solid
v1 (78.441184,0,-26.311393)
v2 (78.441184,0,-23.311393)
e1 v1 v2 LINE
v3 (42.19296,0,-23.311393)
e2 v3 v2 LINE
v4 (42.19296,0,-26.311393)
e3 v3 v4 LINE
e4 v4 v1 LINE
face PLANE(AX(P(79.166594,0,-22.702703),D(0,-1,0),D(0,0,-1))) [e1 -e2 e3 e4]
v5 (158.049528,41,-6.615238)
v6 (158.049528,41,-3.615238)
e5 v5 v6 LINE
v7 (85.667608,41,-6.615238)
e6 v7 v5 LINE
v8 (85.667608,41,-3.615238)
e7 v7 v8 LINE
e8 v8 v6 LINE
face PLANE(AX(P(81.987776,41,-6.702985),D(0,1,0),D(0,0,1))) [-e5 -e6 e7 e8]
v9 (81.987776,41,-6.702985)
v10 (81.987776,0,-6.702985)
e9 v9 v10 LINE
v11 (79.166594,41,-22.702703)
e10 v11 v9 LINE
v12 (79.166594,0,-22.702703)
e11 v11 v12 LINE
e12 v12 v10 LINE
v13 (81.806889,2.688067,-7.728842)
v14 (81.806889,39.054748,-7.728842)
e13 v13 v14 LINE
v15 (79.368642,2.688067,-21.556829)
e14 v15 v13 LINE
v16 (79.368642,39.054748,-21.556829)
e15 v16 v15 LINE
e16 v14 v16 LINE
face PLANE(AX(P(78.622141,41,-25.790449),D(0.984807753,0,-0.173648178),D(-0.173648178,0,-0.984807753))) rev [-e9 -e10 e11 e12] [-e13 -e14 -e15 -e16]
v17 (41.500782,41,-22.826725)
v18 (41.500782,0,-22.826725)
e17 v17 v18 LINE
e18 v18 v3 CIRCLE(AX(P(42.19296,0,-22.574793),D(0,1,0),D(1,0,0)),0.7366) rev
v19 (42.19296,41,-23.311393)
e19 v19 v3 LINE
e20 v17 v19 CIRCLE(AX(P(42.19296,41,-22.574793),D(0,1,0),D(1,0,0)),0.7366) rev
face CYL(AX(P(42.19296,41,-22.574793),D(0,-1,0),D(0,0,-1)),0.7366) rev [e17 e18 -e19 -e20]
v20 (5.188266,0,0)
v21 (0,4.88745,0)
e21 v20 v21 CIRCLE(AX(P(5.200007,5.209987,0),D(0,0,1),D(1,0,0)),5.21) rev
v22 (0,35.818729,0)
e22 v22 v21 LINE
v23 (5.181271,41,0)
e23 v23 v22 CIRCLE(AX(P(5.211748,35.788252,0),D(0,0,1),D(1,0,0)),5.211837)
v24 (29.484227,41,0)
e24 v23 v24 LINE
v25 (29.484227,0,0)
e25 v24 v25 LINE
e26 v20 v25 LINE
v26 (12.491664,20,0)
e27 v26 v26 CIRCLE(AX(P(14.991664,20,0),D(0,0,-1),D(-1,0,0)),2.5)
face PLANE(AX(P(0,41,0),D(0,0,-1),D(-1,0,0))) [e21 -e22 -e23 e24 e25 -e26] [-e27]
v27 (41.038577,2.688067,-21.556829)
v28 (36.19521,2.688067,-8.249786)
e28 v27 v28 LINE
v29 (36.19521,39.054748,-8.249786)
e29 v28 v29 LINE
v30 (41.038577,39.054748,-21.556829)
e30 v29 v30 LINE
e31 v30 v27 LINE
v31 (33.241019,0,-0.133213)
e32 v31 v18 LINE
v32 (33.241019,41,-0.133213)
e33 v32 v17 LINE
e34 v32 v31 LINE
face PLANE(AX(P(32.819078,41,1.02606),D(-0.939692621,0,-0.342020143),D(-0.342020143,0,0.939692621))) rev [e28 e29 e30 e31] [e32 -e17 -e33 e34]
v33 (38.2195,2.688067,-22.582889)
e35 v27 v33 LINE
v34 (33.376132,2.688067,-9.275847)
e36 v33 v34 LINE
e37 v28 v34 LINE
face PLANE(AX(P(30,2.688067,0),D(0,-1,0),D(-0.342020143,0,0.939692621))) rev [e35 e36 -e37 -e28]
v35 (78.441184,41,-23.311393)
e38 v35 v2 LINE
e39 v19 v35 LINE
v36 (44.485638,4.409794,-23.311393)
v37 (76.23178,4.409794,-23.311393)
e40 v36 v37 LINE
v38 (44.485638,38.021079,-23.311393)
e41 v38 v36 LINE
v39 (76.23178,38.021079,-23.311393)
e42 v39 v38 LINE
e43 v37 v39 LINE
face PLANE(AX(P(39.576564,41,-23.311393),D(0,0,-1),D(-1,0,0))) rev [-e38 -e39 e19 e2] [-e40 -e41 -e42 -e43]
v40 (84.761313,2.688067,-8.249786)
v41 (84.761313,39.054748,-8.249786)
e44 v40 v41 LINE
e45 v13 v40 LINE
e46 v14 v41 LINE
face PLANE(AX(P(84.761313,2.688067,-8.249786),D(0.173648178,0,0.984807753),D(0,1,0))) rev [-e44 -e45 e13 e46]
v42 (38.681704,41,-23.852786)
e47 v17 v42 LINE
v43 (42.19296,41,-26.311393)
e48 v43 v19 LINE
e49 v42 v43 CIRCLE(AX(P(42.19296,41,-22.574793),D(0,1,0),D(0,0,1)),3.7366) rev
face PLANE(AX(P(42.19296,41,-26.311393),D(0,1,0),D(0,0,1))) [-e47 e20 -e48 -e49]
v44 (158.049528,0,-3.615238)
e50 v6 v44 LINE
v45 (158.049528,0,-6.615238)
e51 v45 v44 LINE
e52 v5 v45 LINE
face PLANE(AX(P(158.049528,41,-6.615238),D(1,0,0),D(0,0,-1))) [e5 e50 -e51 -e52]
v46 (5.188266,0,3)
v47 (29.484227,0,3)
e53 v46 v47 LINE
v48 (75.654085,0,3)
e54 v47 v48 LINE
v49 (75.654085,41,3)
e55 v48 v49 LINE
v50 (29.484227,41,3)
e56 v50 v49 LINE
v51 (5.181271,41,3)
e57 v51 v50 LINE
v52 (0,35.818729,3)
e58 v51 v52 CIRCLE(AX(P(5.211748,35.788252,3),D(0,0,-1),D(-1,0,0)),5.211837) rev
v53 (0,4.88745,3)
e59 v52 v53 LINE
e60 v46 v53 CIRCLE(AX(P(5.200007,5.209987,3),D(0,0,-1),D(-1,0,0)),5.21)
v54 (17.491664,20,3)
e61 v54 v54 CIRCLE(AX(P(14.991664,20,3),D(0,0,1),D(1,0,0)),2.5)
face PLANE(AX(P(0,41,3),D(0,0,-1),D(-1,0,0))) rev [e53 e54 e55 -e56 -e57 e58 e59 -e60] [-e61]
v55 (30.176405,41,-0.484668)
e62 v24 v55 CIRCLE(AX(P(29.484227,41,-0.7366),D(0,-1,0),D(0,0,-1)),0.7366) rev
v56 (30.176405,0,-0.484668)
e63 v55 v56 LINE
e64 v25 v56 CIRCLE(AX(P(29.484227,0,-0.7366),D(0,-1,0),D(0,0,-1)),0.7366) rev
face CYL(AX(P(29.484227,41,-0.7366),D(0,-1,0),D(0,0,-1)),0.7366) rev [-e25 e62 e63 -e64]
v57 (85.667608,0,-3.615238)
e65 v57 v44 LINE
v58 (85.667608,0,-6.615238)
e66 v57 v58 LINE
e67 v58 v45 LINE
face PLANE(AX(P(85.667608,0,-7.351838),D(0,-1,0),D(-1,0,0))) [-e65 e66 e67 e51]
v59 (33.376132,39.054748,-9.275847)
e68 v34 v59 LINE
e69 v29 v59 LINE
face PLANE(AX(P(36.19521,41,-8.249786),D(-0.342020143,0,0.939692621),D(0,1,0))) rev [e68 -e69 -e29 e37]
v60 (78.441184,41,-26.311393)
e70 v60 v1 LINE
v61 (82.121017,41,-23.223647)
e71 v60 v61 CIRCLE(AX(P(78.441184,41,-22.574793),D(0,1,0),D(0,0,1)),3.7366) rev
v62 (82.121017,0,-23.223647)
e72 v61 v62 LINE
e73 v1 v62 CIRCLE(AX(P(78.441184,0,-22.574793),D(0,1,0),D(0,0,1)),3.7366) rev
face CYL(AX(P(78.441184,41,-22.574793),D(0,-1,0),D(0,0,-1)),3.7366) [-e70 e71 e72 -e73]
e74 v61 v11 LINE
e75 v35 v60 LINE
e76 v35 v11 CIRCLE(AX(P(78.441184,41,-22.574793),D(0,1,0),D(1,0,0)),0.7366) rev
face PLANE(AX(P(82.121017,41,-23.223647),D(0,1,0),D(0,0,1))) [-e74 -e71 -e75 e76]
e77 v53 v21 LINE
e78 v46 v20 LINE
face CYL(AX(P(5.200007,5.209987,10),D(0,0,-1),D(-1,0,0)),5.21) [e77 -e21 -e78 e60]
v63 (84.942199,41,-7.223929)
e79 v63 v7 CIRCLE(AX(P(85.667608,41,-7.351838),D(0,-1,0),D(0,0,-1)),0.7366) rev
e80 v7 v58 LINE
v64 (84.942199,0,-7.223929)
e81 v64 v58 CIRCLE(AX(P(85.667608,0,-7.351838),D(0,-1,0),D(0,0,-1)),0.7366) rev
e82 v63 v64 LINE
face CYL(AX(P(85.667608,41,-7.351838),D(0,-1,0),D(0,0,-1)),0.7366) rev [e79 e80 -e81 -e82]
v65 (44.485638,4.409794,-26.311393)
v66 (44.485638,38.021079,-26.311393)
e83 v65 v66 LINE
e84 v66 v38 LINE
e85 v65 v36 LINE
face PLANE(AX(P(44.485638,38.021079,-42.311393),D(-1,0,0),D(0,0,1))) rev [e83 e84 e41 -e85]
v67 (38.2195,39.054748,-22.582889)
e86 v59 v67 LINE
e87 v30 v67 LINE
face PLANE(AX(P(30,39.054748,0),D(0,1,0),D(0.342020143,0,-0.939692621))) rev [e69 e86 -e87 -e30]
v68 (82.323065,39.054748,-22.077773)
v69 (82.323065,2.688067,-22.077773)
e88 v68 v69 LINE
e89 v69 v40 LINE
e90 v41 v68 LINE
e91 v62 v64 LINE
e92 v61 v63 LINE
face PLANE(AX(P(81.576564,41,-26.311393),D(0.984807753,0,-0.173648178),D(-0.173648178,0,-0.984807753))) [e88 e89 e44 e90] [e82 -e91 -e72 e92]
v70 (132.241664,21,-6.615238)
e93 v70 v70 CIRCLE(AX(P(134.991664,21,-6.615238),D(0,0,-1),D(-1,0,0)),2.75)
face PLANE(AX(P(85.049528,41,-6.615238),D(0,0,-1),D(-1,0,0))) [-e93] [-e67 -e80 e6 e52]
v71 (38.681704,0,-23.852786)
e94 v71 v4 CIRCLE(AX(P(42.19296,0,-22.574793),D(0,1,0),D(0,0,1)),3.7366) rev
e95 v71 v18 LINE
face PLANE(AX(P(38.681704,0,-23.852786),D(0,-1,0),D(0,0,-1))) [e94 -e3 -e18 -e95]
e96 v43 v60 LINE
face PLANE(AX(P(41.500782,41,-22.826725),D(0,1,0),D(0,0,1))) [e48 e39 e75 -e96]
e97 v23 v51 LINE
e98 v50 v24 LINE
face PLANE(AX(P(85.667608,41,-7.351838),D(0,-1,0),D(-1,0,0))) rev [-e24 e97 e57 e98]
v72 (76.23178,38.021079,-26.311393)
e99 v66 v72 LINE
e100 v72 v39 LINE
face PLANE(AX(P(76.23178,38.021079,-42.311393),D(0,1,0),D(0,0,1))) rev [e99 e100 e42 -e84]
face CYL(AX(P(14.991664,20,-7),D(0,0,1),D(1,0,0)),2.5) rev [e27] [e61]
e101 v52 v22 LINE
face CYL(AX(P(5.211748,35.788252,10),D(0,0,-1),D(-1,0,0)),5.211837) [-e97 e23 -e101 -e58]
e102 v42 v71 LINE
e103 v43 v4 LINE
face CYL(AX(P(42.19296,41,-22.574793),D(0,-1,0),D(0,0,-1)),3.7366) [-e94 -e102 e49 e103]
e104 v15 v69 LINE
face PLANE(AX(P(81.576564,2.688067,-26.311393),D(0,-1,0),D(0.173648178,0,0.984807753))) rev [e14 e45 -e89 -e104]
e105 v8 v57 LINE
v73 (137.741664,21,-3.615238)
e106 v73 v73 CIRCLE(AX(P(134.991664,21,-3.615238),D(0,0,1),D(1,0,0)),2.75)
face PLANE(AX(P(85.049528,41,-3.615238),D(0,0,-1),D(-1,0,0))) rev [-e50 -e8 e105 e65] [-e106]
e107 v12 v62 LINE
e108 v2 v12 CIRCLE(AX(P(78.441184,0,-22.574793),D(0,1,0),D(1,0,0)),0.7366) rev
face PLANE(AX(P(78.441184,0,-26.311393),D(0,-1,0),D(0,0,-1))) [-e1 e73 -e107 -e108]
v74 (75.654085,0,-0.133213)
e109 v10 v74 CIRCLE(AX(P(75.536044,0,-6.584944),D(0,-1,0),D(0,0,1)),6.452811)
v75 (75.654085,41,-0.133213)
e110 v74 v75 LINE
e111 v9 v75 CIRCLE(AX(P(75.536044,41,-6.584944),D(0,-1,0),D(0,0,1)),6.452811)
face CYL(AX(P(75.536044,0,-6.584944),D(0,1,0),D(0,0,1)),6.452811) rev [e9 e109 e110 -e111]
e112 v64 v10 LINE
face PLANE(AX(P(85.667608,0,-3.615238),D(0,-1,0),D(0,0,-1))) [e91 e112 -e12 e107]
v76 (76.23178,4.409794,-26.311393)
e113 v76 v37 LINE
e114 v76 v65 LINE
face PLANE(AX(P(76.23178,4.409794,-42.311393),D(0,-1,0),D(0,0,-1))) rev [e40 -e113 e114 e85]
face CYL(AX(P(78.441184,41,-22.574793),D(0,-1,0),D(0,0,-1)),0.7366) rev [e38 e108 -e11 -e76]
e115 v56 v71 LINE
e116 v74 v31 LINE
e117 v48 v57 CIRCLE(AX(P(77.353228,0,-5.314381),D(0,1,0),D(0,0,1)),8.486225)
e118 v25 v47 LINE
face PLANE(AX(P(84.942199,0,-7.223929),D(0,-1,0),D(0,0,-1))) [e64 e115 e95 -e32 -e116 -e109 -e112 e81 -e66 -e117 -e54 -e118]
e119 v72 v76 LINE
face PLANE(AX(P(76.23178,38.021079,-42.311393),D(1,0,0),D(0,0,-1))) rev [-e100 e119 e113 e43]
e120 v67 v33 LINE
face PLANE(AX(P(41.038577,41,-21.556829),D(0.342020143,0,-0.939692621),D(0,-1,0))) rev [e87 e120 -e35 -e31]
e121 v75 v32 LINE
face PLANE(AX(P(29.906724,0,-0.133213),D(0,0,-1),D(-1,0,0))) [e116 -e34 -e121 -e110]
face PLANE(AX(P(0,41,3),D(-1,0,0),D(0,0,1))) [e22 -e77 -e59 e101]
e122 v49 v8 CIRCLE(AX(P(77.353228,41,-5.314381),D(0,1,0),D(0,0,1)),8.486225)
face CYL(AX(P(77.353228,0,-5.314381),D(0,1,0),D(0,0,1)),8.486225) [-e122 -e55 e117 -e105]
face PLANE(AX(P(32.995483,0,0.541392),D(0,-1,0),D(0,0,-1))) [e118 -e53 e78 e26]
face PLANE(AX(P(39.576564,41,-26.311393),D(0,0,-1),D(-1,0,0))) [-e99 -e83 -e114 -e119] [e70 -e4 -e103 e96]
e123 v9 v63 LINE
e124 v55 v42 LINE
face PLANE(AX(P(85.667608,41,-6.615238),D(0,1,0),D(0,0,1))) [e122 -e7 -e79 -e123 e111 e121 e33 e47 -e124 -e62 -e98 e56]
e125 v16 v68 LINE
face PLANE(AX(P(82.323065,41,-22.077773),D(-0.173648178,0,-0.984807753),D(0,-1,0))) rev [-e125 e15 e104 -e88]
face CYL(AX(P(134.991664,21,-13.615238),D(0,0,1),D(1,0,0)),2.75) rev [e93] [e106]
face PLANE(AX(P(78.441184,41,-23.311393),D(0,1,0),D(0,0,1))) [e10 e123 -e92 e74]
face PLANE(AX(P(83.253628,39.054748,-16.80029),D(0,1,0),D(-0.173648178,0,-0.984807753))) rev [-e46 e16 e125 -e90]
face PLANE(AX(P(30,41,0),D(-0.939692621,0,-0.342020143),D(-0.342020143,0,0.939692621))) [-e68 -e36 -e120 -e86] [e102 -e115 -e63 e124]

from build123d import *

# Parameters (mm, degrees)
BASE_FLANGE1_DEPTH  = 41
SKETCH2_R           = 2.5
CUT_EXTRUDE1_DEPTH  = 10
SKETCH3_R           = 2.75
SKETCH3_R_2         = 2.5
CUT_EXTRUDE2_DEPTH  = 10
BOSS_EXTRUDE1_START = -41
BOSS_EXTRUDE1_DEPTH = 41
SKETCH5_W           = 31.746142427
SKETCH5_H           = 33.611284957
CUT_EXTRUDE3_DEPTH  = 19
CUT_EXTRUDE4_START  = 2.688066512
CUT_EXTRUDE4_DEPTH  = 36.36668128
CUT_EXTRUDE5_DEPTH  = 3


# Read off the part's stored shape, not the designer's step: Cut-Extrude4, Cut-Extrude5
# Sheet-metal steps are written as plain solids
with BuildPart() as part:
    # Sketch1 → Base-Flange1 (new body)
    with BuildSketch(Plane(origin=(0, 0, 0), x_dir=(1, 0, 0), z_dir=(0, 1, 0))):
        with BuildLine():
            Line((0, 0), (29.484227127, 0))
            ThreePointArc((29.484227127, 0), (29.90672353, 0.133212604), (30.176404712, 0.484667962))
            Line((30.176404712, 0.484667962), (38.681704054, 23.85278585))
            ThreePointArc((38.681704054, 23.85278585), (40.049733788, 25.635636911), (42.1929595, 26.311393382))
            Line((42.1929595, 26.311393382), (78.441184331, 26.311393382))
            ThreePointArc((78.441184331, 26.311393382), (80.843024514, 25.437195048), (82.121016981, 23.223647163))
            Line((82.121016981, 23.223647163), (84.942198964, 7.223929074))
            ThreePointArc((84.942198964, 7.223929074), (85.194131001, 6.787569985), (85.667608355, 6.615238322))
            Line((85.667608355, 6.615238322), (158.049527566, 6.615238322))
            Line((158.049527566, 6.615238322), (158.049527566, 3.615238322))
            Line((158.049527566, 3.615238322), (85.667608355, 3.615238322))
            ThreePointArc((85.667608355, 3.615238322), (83.265768172, 4.489436656), (81.987775705, 6.702984541))
            Line((81.987775705, 6.702984541), (79.166593722, 22.70270263))
            ThreePointArc((79.166593722, 22.70270263), (78.914661685, 23.139061719), (78.441184331, 23.311393382))
            Line((78.441184331, 23.311393382), (42.1929595, 23.311393382))
            ThreePointArc((42.1929595, 23.311393382), (41.770463097, 23.178180778), (41.500781916, 22.82672542))
            Line((41.500781916, 22.82672542), (32.995482574, -0.541392468))
            ThreePointArc((32.995482574, -0.541392468), (31.627452839, -2.324243529), (29.484227127, -3))
            Line((29.484227127, -3), (0, -3))
            Line((0, -3), (0, 0))
        make_face()
    extrude(amount=BASE_FLANGE1_DEPTH)

    # Sketch2 → Cut-Extrude1 (cut)
    with BuildSketch(Plane.XY.offset(3)):
        with Locations((14.991664351, 20)):
            Circle(SKETCH2_R)
    extrude(amount=-CUT_EXTRUDE1_DEPTH, mode=Mode.SUBTRACT)

    # Sketch3 → Cut-Extrude2 (cut)
    with BuildSketch(Plane.XY.offset(-3.615238322)):
        with Locations((134.991664351, 21)):
            Circle(SKETCH3_R)
        with Locations((14.991664351, 20)):
            Circle(SKETCH3_R_2)
    extrude(amount=-CUT_EXTRUDE2_DEPTH, mode=Mode.SUBTRACT)

    # Sketch4 → Boss-Extrude1 (add)
    with BuildSketch(Plane(origin=(0, 41, 0), x_dir=(1, 0, 0), z_dir=(0, 1, 0)).offset(BOSS_EXTRUDE1_START)):
        with BuildLine():
            Line((29.484227127, -3), (75.654085032, -3))
            ThreePointArc((75.654085032, -3), (82.030907409, -1.766249423), (85.667608355, 3.615238322))
            ThreePointArc((85.667608355, 3.615238322), (83.265768172, 4.489436656), (81.987775705, 6.702984541))
            ThreePointArc((81.987775705, 6.702984541), (80.181574687, 2.106348284), (75.654085032, 0.133212604))
            Line((75.654085032, 0.133212604), (29.90672353, 0.133212604))
            Line((29.90672353, 0.133212604), (29.484227127, -3))
        make_face()
    extrude(amount=BOSS_EXTRUDE1_DEPTH)

    # Sketch5 → Cut-Extrude3 (cut)
    with BuildSketch(Plane.XY.offset(-23.311393382)):
        with Locations((60.358708807, 21.215436548)):
            Rectangle(SKETCH5_W, SKETCH5_H)
    extrude(amount=-CUT_EXTRUDE3_DEPTH, mode=Mode.SUBTRACT)

    # Cut-Extrude4 outline → Cut-Extrude4 (cut)
    with BuildSketch(Plane(origin=(0, 0, 0), x_dir=(1, 0, 0), z_dir=(0, 1, 0)).offset(CUT_EXTRUDE4_START)):
        Polygon((79.368642173, 21.556828923), (81.806889388, 7.728841823), (84.761312647, 8.249786356), (82.323065432, 22.077773456), align=None)
        Polygon((38.219499528, 22.582889353), (33.376132128, 9.275846786), (36.19520999, 8.249786356), (41.038577391, 21.556828923), align=None)
    extrude(amount=CUT_EXTRUDE4_DEPTH, mode=Mode.SUBTRACT)

    # Cut-Extrude5 outline → Cut-Extrude5 (cut)
    with BuildSketch(Plane.XY):
        with BuildLine():
            Line((0, 41), (0, 35.818729295))
            ThreePointArc((0, 35.818729295), (1.526422616, 39.473577384), (5.181270705, 41))
            Line((5.181270705, 41), (0, 41))
        make_face()
        with BuildLine():
            ThreePointArc((5.188265578, 0), (1.627560559, 1.417661865), (0, 4.887450335))
            Line((0, 4.887450335), (0, 0))
            Line((0, 0), (5.188265578, 0))
        make_face()
    extrude(amount=CUT_EXTRUDE5_DEPTH, mode=Mode.SUBTRACT)


solid = part.part
